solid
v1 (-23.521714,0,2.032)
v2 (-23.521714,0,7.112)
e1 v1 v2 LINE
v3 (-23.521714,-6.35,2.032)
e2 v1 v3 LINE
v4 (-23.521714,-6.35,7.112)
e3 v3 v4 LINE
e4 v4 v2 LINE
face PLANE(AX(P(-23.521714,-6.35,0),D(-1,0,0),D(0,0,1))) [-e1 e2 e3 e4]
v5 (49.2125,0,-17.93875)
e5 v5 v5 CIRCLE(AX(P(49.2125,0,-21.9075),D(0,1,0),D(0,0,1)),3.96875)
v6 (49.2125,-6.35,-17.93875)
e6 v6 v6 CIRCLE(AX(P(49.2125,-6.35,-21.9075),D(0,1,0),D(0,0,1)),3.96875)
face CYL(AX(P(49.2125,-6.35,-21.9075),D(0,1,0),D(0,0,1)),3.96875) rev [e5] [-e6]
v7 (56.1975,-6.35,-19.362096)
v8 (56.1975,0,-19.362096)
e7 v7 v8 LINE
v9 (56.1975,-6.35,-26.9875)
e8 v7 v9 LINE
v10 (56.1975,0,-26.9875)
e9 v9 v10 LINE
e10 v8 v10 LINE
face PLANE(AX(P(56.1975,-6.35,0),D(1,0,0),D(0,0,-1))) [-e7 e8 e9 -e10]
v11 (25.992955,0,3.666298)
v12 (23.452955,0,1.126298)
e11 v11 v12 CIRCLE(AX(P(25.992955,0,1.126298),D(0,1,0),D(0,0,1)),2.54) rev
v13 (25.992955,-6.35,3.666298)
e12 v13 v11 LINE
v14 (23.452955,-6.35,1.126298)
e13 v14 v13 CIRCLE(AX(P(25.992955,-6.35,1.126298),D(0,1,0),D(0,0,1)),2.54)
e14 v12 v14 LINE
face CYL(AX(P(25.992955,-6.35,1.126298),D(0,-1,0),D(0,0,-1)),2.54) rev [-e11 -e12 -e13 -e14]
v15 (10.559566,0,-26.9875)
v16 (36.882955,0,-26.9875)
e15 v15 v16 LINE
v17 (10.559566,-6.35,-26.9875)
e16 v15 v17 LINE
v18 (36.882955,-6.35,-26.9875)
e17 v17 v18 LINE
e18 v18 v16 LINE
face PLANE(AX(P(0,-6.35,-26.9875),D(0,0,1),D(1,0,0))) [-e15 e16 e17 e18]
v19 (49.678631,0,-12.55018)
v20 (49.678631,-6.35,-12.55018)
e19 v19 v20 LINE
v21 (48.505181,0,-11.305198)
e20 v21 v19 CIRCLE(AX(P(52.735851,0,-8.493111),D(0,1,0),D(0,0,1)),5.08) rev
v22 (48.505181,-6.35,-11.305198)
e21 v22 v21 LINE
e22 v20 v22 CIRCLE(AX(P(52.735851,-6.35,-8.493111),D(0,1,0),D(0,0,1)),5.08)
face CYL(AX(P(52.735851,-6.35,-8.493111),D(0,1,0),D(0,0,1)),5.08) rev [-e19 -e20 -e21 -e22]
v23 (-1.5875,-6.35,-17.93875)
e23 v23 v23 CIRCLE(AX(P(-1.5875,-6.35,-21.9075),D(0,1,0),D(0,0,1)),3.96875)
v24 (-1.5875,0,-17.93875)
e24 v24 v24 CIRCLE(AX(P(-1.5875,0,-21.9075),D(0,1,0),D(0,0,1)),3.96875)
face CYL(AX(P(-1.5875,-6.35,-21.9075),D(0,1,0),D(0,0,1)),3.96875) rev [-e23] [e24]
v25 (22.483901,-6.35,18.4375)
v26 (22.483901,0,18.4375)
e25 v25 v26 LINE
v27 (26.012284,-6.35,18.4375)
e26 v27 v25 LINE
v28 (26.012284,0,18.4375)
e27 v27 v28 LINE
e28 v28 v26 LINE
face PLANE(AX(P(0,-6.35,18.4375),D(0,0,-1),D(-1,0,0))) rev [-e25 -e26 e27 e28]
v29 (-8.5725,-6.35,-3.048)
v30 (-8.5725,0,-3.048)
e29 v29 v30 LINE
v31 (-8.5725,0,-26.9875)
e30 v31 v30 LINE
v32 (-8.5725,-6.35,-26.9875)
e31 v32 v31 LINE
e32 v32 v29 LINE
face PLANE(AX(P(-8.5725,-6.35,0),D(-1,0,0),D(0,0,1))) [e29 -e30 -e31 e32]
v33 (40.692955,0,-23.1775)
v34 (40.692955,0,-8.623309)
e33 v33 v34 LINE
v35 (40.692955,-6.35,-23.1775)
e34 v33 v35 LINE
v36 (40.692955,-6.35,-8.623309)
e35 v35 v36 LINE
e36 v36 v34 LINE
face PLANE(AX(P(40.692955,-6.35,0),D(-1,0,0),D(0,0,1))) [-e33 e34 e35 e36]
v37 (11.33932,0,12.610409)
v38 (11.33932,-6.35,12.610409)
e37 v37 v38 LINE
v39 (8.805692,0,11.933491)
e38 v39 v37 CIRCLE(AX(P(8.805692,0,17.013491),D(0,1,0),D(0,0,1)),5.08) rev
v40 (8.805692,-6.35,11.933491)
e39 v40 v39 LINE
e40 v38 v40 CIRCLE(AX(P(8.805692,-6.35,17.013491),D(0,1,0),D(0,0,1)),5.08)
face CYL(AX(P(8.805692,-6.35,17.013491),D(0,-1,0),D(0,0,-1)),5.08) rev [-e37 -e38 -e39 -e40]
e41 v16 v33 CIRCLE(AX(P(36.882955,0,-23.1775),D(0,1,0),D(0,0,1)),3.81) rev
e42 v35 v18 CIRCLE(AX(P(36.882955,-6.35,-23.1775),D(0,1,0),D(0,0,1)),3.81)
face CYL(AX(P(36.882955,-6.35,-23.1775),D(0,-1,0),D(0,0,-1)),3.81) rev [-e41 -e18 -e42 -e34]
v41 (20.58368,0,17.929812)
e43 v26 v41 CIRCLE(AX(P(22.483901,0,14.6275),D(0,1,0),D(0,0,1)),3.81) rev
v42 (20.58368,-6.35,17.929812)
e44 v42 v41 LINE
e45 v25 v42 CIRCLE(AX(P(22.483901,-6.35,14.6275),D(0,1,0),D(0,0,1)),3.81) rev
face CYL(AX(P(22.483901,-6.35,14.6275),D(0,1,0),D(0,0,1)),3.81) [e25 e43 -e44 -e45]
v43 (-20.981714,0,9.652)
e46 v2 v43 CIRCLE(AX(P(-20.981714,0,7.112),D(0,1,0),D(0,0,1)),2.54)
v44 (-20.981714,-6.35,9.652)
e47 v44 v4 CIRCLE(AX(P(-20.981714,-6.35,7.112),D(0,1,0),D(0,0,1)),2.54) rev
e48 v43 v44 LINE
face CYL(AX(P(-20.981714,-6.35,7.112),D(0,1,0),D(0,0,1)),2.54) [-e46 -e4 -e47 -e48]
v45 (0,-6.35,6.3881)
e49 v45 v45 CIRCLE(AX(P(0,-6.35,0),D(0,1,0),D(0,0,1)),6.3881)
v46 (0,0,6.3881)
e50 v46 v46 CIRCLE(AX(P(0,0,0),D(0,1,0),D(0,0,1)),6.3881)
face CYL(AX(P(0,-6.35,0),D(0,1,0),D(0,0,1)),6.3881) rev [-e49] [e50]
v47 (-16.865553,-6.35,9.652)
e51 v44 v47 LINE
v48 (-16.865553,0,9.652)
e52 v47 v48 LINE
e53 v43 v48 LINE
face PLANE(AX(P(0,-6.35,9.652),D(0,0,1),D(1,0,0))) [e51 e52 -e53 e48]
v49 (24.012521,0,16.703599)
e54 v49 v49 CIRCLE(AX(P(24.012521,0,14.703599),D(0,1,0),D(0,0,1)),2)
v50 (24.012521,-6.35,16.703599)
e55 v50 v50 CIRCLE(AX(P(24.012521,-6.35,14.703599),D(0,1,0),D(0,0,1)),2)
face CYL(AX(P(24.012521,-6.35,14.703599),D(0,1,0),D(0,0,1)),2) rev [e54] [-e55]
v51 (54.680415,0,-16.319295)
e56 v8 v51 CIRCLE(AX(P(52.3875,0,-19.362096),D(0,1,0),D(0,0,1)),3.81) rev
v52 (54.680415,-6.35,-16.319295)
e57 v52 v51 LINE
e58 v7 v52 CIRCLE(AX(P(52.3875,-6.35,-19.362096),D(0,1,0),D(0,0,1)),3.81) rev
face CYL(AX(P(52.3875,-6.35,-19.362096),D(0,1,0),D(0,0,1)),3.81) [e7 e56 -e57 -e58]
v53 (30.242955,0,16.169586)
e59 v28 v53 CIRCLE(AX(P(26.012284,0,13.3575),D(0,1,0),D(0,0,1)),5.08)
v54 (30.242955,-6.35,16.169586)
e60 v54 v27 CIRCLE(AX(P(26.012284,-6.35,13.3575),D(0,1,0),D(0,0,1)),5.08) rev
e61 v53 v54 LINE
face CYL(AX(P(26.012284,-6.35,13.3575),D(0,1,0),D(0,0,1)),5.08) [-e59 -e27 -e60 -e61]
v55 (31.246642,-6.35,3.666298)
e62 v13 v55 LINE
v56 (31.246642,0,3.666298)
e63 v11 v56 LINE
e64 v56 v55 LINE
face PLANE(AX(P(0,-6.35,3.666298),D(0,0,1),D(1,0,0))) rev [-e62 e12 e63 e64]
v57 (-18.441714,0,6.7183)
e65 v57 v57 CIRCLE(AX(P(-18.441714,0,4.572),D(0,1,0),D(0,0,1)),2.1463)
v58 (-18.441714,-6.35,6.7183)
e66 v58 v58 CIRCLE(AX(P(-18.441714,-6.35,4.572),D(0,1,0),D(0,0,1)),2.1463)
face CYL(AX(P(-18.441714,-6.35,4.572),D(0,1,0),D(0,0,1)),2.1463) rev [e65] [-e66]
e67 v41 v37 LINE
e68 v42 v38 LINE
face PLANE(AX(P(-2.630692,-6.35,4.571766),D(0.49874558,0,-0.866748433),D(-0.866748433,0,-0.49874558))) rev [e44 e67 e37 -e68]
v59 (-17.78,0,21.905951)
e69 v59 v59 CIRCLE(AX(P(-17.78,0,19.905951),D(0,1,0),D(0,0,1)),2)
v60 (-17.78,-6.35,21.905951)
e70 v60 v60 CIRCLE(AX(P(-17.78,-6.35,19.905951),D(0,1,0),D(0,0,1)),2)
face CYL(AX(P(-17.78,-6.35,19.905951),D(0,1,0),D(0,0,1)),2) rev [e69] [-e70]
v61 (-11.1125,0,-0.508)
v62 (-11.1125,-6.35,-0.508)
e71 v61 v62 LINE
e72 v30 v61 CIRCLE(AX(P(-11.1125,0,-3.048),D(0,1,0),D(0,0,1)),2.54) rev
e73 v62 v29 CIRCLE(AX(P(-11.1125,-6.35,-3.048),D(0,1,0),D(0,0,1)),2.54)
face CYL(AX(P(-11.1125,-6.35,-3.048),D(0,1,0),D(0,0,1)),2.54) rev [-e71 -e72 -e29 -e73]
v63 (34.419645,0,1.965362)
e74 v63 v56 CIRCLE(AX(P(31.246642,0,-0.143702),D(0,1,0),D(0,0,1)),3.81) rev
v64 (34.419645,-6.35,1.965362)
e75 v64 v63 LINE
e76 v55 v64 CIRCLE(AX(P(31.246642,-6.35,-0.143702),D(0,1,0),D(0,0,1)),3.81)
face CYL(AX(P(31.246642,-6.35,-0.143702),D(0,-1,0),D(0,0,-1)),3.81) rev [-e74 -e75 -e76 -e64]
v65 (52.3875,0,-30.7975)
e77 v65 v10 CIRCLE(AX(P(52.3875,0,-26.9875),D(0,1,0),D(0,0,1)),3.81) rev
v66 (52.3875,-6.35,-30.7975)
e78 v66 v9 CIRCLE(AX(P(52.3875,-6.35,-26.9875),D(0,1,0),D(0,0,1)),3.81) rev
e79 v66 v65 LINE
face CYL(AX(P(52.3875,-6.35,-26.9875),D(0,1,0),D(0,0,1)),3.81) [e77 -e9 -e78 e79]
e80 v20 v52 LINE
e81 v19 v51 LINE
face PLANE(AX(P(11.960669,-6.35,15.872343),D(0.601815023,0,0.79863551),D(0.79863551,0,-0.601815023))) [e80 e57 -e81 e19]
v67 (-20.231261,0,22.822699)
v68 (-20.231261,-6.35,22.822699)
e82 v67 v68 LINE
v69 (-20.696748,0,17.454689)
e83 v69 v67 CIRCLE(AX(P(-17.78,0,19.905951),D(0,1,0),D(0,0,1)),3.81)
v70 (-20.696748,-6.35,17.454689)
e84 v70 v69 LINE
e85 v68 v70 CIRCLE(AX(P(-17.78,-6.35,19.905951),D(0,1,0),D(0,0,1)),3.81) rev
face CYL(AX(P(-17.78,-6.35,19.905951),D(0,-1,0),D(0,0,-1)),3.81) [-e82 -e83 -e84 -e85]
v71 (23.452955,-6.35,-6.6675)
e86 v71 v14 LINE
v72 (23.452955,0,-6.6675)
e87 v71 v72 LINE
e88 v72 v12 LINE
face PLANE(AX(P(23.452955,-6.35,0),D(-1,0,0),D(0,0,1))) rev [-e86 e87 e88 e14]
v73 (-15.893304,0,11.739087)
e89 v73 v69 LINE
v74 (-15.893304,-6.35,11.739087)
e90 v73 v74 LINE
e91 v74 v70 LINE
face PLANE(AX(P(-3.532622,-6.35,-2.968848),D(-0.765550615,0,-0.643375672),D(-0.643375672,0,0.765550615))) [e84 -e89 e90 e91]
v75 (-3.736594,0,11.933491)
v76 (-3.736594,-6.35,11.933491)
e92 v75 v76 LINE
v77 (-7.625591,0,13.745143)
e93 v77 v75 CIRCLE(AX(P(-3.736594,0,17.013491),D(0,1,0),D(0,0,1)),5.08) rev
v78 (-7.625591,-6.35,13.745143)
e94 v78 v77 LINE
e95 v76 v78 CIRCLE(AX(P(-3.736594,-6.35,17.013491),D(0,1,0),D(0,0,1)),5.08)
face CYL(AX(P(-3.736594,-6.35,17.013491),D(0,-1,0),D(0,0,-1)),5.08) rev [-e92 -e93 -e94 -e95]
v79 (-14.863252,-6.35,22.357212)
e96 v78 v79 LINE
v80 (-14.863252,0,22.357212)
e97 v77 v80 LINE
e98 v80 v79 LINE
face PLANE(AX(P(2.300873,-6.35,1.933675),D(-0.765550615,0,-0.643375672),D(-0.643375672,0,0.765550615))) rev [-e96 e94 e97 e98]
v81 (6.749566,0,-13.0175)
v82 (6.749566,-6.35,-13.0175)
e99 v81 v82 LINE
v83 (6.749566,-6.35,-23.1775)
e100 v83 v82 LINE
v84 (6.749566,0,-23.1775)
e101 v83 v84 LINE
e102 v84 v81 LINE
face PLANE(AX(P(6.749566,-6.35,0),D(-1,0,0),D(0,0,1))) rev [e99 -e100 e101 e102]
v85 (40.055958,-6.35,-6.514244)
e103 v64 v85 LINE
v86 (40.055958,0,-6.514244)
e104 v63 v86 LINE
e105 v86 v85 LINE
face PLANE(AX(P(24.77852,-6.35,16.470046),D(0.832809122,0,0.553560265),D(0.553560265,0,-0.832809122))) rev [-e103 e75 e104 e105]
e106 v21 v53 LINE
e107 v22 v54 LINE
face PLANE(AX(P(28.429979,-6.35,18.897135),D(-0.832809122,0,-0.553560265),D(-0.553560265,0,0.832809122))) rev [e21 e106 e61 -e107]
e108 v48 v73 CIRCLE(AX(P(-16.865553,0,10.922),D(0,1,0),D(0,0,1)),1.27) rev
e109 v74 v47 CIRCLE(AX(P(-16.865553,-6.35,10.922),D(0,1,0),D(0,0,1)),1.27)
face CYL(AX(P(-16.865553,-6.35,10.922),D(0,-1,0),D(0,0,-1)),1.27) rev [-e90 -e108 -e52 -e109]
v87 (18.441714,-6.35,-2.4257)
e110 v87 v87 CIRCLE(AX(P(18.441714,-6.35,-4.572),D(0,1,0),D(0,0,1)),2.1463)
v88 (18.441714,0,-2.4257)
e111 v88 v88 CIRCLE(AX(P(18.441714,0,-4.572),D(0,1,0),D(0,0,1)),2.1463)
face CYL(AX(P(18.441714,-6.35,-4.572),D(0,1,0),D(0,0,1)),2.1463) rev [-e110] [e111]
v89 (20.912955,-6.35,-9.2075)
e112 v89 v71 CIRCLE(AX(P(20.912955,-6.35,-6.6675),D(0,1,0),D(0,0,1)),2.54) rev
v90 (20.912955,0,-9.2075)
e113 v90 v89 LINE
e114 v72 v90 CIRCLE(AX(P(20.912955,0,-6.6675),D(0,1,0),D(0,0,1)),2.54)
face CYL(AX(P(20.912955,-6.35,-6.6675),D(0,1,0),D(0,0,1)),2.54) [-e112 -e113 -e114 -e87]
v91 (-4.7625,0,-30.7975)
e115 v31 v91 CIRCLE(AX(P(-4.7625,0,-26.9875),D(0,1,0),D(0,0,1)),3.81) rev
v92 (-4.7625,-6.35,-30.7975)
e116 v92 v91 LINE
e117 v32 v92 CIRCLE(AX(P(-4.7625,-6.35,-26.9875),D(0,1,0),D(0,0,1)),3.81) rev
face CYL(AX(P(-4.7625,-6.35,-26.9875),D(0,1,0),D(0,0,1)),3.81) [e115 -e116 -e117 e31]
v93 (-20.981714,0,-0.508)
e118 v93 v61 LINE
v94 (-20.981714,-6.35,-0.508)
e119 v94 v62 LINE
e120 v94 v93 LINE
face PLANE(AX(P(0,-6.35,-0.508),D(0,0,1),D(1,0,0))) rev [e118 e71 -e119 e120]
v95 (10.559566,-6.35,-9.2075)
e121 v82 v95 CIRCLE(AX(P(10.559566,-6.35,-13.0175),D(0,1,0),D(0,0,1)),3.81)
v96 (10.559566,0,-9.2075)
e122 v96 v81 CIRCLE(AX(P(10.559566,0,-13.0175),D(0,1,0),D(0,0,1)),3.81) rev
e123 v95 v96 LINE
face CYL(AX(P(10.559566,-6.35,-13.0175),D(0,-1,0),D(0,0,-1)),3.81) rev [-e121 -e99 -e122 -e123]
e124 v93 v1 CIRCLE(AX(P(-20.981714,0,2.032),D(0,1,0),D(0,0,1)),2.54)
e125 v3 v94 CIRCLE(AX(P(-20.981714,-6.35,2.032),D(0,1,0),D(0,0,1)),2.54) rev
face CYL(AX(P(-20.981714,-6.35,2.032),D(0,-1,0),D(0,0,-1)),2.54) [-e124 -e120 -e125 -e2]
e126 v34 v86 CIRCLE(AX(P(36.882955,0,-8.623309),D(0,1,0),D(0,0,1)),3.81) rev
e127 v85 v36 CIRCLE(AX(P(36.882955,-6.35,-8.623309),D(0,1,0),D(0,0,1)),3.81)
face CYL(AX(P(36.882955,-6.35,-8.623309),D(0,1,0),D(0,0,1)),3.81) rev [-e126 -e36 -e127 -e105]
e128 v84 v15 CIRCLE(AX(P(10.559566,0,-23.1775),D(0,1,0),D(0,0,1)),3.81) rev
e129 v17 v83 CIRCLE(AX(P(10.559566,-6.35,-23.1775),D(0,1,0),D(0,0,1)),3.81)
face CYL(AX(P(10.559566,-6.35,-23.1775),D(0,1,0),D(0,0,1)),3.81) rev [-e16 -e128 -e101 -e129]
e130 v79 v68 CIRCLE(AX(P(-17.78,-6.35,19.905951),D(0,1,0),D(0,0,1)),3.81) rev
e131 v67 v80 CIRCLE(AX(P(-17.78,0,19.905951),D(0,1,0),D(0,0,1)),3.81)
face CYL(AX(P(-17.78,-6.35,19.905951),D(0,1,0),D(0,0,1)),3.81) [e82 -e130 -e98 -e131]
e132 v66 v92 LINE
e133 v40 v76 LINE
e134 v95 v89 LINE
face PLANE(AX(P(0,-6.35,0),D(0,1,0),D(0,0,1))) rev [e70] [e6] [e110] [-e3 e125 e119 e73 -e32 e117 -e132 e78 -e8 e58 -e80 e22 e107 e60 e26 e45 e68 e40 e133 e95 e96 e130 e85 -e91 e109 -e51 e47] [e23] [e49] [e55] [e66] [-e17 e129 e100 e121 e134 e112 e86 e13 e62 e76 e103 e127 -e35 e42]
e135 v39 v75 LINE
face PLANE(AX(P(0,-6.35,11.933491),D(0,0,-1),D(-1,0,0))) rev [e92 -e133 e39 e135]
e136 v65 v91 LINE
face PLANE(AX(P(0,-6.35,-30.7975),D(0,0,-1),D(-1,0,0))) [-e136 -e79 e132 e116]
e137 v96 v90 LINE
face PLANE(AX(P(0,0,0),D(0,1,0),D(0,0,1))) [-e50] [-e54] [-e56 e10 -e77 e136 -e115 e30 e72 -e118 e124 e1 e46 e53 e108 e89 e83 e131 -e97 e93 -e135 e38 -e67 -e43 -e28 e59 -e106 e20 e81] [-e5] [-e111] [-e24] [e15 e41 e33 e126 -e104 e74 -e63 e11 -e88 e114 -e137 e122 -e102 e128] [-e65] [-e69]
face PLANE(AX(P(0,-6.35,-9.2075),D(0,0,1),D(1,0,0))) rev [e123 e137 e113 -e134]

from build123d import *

# Parameters (mm, degrees)
SKETCH4_R           = 6.3881
SKETCH4_R_2         = 3.96875
SKETCH4_R_3         = 2
SKETCH4_R_4         = 2.1463
BOSS_EXTRUDE2_DEPTH = 6.35
FILLET1_R           = 5.08
FILLET7_R           = 3.81
FILLET9_R           = 5.08
FILLET10_R          = 1.27
FILLET11_R          = 3.81
FILLET12_R          = 2.54
FILLET13_R          = 3.81


with BuildPart() as part:
    # Sketch4 → Boss-Extrude2 (new body)
    with BuildSketch(Plane(origin=(0, 0, 0), x_dir=(1, 0, 0), z_dir=(0, 1, 0))):
        with BuildLine():
            Line((28.735494078, -18.4375), (22.483900583, -18.4375))
            ThreePointArc((22.483900583, -18.4375), (21.500464498, -18.308390309), (20.583679925, -17.929811531))
            Line((20.583679925, -17.929811531), (10.16293305, -11.933490986))
            Line((10.16293305, -11.933490986), (-6.103062549, -11.933490986))
            Line((-6.103062549, -11.933490986), (-17.314513469, -25.273959881))
            Line((-17.314513469, -25.273959881), (-23.148009155, -20.371437257))
            Line((-23.148009155, -20.371437257), (-14.139296969, -9.652))
            Line((-14.139296969, -9.652), (-23.52171402, -9.652))
            Line((-23.52171402, -9.652), (-23.52171402, 0.508))
            Line((-23.52171402, 0.508), (-8.5725, 0.508))
            Line((-8.5725, 0.508), (-8.5725, 12.607500122))
            Line((-8.5725, 12.607500122), (-8.5725, 26.9875))
            ThreePointArc((-8.5725, 26.9875), (-7.456576836, 29.681576836), (-4.7625, 30.7975))
            Line((-4.7625, 30.7975), (52.3875, 30.7975))
            ThreePointArc((52.3875, 30.7975), (55.081576836, 29.681576836), (56.1975, 26.9875))
            Line((56.1975, 26.9875), (56.1975, 19.362095927))
            ThreePointArc((56.1975, 19.362095927), (55.797199918, 17.662082259), (54.680415238, 16.319294633))
            Line((54.680415238, 16.319294633), (48.985566477, 12.027918285))
            Line((48.985566477, 12.027918285), (28.735494078, -18.4375))
        make_face()
        with Locations(Location((0, 0, 0), (0, 0, 270))):
            Circle(SKETCH4_R, mode=Mode.SUBTRACT)
        with Locations(Location((-1.5875, 21.9075, 0), (0, 0, 270))):
            Circle(SKETCH4_R_2, mode=Mode.SUBTRACT)
        with Locations(Location((49.2125, 21.9075, 0), (0, 0, 270))):
            Circle(SKETCH4_R_2, mode=Mode.SUBTRACT)
        with Locations(Location((24.012521227, -14.703599027, 0), (0, 0, 270))):
            Circle(SKETCH4_R_3, mode=Mode.SUBTRACT)
        with Locations(Location((-17.78, -19.905950726, 0), (0, 0, 270))):
            Circle(SKETCH4_R_3, mode=Mode.SUBTRACT)
        with Locations(Location((18.44171402, 4.572, 0), (0, 0, 270))):
            Circle(SKETCH4_R_4, mode=Mode.SUBTRACT)
        with Locations(Location((-18.44171402, -4.572, 0), (0, 0, 270))):
            Circle(SKETCH4_R_4, mode=Mode.SUBTRACT)
        Polygon((6.749565973, 26.9875), (40.692955064, 26.9875), (40.692955064, 7.472580753), (33.28904903, -3.666297657), (23.452955064, -3.666297657), (23.452955064, 9.2075), (6.749565973, 9.2075), align=None, mode=Mode.SUBTRACT)
    extrude(amount=-BOSS_EXTRUDE2_DEPTH)

    # Fillet1
    fillet1_edges = [part.edges().sort_by_distance(p)[0] for p in [
        (48.985566477, -3.175, -12.027918285),
        (28.735494078, -3.175, 18.4375),
    ]]
    fillet(fillet1_edges, radius=FILLET1_R)

    # Fillet7
    fillet7_edges = [part.edges().sort_by_distance(p)[0] for p in [
        (40.692955064, -3.175, -7.472580753),
        (40.692955064, -3.175, -26.9875),
        (6.749565973, -3.175, -26.9875),
        (6.749565973, -3.175, -9.2075),
    ]]
    fillet(fillet7_edges, radius=FILLET7_R)

    # Fillet9
    fillet9_edges = [part.edges().sort_by_distance(p)[0] for p in [
        (10.16293305, -3.175, 11.933490986),
        (-6.103062549, -3.175, 11.933490986),
    ]]
    fillet(fillet9_edges, radius=FILLET9_R)

    # Fillet10
    fillet10_edges = [part.edges().sort_by_distance(p)[0] for p in [
        (-14.139296969, -3.175, 9.652),
    ]]
    fillet(fillet10_edges, radius=FILLET10_R)

    # Fillet11
    fillet11_edges = [part.edges().sort_by_distance(p)[0] for p in [
        (-17.314513469, -3.175, 25.273959881),
        (-23.148009155, -3.175, 20.371437257),
    ]]
    fillet(fillet11_edges, radius=FILLET11_R - 0.0001)  # a hair under: the kernel refuses the full size

    # Fillet12
    fillet12_edges = [part.edges().sort_by_distance(p)[0] for p in [
        (23.452955064, -3.175, -9.2075),
        (23.452955064, -3.175, 3.666297657),
        (-23.52171402, -3.175, 9.652),
        (-23.52171402, -3.175, -0.508),
        (-8.5725, -3.175, -0.508),
    ]]
    fillet(fillet12_edges, radius=FILLET12_R)

    # Fillet13
    fillet13_edges = [part.edges().sort_by_distance(p)[0] for p in [
        (33.28904903, -3.175, 3.666297657),
    ]]
    fillet(fillet13_edges, radius=FILLET13_R)


solid = part.part
